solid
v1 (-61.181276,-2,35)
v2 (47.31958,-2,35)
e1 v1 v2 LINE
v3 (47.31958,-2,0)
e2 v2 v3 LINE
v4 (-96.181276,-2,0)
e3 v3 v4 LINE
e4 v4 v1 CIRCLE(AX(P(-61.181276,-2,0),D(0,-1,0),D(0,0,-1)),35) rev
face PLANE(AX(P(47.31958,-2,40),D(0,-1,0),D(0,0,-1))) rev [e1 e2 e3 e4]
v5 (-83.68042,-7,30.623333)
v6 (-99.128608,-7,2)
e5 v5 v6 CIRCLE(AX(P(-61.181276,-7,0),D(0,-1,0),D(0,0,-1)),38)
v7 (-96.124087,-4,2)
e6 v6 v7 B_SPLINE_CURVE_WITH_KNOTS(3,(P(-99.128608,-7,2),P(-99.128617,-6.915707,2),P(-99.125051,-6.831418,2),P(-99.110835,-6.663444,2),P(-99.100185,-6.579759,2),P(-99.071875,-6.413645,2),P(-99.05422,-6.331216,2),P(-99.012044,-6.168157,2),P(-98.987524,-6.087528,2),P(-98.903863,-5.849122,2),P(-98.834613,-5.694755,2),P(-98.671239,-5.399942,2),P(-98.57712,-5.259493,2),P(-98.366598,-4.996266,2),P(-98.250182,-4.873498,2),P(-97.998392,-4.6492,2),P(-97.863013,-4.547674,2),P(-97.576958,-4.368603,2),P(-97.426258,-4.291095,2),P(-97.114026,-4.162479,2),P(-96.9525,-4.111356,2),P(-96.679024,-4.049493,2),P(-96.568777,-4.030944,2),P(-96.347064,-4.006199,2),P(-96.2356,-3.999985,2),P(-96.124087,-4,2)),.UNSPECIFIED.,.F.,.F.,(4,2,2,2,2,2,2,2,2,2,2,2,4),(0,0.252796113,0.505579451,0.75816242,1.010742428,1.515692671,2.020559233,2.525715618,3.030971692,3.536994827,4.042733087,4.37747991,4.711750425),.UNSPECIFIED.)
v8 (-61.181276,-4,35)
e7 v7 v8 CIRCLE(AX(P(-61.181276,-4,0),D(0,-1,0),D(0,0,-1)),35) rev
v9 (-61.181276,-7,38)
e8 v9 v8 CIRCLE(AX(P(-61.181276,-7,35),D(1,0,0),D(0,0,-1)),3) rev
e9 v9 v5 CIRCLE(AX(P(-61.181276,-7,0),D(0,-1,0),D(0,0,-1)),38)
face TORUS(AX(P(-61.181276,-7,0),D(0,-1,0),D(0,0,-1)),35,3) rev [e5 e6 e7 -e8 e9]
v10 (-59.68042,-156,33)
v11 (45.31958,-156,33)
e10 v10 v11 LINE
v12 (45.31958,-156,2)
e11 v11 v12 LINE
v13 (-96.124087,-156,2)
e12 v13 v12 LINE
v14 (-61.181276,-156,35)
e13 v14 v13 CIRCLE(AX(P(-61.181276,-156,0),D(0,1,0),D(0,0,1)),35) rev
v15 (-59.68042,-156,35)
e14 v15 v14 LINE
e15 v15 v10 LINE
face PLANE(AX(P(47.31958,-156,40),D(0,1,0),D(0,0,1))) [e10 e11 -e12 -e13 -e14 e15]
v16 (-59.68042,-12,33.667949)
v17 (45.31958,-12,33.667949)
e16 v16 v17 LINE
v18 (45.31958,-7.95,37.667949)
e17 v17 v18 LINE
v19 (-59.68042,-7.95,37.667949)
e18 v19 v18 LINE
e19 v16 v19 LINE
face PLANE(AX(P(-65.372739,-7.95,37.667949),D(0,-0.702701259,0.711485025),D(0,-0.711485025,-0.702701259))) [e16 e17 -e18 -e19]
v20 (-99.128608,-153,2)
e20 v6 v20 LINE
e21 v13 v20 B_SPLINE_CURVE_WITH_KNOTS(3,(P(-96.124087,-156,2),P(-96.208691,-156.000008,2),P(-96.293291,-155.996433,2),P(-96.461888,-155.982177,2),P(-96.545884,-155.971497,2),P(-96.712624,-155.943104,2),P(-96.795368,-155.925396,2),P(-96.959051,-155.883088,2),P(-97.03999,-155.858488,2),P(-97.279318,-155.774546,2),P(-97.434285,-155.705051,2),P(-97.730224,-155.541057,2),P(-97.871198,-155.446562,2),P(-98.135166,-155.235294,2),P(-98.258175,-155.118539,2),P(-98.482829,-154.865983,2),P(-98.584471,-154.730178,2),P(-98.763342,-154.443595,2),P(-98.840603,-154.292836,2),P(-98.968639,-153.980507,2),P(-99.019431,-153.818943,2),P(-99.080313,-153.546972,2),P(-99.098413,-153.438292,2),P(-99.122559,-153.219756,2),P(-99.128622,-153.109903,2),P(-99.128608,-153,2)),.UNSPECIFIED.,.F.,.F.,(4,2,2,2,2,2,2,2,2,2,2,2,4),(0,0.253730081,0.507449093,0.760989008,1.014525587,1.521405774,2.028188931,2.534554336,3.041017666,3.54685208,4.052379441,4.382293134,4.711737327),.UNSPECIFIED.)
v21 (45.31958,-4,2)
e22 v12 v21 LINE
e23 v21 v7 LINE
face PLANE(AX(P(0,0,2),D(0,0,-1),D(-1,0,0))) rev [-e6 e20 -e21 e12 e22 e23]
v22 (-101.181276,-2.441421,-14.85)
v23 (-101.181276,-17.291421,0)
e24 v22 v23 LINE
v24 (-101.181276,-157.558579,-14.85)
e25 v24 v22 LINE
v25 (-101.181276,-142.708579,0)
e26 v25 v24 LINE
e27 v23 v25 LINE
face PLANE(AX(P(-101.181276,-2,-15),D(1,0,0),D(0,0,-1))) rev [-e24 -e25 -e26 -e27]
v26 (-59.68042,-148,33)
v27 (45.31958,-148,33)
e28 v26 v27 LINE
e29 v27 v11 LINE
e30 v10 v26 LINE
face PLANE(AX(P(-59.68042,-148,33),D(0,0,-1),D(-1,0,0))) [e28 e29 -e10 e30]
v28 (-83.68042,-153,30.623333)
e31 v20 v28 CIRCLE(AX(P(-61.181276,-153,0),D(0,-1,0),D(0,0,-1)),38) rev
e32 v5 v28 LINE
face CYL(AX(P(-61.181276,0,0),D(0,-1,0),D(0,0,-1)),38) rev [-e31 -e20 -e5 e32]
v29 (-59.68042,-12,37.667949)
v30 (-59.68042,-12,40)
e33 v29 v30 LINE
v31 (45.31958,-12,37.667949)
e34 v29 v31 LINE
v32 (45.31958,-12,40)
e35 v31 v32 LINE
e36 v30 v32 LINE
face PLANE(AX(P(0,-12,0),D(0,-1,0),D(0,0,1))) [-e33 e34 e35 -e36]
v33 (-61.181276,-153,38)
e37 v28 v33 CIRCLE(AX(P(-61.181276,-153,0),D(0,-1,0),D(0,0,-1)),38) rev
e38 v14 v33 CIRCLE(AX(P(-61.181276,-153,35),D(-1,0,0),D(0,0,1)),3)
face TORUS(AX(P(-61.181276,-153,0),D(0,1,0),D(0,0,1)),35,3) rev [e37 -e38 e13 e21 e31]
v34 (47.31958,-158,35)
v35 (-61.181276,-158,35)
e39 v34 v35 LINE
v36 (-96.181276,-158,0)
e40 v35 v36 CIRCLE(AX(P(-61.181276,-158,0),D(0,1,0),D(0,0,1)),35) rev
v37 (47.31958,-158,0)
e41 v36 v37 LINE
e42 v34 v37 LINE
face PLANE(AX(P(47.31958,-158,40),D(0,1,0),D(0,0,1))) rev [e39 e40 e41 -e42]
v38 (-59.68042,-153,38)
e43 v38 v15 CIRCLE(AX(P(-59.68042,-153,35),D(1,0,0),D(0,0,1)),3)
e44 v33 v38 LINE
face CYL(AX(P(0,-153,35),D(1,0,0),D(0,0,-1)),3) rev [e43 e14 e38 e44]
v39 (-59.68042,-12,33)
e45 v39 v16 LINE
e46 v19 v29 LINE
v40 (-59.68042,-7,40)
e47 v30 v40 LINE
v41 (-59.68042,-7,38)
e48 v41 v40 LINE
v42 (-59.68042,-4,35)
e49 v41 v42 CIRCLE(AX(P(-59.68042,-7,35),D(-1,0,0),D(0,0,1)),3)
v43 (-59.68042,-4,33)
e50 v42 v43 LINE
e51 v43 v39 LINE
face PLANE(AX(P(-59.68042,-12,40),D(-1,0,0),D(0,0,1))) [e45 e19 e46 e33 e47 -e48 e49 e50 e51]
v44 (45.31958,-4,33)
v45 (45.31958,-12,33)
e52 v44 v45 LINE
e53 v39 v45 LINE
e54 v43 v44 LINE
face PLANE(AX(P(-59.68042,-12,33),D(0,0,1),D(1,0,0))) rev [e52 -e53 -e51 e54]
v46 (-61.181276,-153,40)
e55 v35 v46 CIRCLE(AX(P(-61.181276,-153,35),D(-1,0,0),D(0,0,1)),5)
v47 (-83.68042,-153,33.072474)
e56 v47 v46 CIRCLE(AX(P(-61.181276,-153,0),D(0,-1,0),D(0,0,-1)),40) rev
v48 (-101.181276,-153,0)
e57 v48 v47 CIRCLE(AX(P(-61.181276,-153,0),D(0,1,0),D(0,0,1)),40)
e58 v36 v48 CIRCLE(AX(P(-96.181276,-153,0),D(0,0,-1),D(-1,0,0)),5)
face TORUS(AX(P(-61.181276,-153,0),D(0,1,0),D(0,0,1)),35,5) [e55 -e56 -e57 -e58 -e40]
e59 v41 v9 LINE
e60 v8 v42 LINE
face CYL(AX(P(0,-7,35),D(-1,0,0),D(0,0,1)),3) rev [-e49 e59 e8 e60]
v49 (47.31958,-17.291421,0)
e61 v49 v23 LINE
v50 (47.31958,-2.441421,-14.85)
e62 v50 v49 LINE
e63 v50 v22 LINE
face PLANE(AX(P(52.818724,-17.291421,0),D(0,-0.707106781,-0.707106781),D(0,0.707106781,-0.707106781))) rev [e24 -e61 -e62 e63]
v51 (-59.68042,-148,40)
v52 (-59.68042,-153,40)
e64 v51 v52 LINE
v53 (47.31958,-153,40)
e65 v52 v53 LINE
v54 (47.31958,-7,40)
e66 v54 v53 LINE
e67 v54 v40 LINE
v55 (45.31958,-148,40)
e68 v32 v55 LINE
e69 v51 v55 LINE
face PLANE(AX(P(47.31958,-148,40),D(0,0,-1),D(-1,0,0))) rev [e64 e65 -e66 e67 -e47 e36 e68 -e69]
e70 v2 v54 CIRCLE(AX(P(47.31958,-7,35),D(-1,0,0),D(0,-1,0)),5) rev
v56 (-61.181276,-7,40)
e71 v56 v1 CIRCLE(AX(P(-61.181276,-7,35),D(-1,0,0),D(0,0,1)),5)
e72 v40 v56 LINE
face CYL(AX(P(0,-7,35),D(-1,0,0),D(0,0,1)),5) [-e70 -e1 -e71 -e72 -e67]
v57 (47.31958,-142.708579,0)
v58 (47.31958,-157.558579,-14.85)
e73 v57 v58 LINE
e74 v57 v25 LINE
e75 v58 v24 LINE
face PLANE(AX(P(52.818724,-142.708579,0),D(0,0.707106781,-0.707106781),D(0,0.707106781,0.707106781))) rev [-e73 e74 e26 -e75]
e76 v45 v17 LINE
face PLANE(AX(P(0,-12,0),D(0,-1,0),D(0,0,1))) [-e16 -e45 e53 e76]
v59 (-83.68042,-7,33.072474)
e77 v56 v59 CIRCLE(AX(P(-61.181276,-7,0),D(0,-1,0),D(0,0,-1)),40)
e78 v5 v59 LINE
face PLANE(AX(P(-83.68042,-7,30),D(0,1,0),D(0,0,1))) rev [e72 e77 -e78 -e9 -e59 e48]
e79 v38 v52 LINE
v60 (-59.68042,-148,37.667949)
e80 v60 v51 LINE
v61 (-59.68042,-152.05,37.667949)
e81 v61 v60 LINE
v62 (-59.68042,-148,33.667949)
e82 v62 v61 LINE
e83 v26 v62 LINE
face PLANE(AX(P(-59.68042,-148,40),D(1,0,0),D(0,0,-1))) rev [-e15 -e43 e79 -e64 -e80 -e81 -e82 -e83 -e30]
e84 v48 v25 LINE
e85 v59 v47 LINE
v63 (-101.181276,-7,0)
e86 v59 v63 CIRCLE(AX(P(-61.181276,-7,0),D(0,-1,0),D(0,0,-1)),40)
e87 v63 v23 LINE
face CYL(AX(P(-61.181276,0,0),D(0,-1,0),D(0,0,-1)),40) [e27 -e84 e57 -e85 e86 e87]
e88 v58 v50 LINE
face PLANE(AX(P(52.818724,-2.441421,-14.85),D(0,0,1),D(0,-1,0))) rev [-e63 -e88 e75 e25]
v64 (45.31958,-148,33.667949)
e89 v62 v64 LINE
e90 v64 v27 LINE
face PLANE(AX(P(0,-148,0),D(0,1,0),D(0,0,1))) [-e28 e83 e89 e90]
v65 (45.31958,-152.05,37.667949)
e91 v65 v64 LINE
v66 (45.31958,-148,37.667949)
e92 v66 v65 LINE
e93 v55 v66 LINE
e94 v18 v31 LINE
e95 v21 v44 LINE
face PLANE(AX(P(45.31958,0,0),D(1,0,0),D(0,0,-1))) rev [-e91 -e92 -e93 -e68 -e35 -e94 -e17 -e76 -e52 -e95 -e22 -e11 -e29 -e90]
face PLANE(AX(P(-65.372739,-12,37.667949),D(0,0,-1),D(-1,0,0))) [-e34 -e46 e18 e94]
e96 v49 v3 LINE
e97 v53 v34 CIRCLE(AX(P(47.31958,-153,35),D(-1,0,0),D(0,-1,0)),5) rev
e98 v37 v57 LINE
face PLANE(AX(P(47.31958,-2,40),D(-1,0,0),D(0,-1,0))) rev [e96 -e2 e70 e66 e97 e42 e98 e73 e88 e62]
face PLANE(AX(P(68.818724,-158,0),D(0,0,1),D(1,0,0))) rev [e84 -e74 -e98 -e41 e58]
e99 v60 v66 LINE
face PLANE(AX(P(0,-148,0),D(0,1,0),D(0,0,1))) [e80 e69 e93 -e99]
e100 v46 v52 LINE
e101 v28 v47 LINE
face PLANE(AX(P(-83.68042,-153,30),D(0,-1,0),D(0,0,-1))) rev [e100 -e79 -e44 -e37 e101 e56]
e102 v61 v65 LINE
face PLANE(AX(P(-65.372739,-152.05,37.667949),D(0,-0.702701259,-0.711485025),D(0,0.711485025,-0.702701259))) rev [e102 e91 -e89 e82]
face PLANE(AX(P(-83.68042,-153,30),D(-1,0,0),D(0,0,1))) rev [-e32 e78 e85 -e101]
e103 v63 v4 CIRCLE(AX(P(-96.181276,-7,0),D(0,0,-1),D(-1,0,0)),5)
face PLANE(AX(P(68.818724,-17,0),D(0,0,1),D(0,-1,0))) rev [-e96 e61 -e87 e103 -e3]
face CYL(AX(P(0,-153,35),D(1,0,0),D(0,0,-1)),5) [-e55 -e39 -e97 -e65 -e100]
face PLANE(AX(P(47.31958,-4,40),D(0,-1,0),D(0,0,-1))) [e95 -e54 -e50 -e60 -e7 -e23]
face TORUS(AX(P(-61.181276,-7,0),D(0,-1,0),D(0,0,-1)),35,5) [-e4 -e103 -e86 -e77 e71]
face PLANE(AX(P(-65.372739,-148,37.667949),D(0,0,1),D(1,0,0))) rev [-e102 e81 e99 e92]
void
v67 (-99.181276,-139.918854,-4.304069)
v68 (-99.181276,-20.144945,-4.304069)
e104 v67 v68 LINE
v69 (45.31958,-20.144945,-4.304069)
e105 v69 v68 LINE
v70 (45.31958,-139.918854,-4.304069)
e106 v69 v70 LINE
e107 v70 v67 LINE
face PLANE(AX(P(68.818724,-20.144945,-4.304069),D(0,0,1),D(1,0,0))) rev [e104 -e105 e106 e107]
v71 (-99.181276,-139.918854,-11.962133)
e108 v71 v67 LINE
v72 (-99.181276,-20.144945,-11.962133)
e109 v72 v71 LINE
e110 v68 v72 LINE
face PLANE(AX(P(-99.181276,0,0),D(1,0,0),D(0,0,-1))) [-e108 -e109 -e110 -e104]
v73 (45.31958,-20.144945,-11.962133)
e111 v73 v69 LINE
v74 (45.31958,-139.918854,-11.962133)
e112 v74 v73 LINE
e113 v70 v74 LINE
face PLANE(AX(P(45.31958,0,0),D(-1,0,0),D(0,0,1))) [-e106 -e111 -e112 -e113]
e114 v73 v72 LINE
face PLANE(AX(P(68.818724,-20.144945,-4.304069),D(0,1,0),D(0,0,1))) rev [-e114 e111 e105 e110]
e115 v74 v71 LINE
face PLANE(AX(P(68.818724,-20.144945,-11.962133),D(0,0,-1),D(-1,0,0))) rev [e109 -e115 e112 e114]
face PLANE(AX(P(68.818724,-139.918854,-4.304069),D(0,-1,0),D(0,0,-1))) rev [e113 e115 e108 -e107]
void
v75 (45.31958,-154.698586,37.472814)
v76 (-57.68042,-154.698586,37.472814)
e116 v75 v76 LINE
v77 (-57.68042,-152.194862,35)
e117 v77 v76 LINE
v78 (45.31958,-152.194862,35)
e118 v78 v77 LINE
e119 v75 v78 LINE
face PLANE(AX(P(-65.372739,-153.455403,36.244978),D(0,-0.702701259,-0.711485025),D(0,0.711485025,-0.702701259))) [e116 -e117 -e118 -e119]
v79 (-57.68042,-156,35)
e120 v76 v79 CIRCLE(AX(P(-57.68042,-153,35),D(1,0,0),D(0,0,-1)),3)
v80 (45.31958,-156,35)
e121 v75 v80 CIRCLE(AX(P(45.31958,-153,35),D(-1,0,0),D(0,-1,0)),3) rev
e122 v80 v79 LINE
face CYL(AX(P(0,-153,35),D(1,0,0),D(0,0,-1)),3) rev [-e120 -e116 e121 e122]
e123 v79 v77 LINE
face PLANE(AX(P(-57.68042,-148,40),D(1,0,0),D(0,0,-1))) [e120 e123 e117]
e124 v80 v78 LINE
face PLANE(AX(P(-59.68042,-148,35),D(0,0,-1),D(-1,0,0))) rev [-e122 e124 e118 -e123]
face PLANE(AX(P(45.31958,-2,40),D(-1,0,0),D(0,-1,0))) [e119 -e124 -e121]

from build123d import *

# Parameters (mm, degrees)
SKETCH1_W            = 148.500856602
SKETCH1_H            = 156
BOSS_EXTRUDE1_DEPTH  = 40
FILLET3_R            = 40
FILLET4_R            = 5
SHELL4_T             = -2
SKETCH19_W           = 131
SKETCH19_H           = 146
CUT_EXTRUDE8_DEPTH   = 10
SKETCH21_W           = 107
SKETCH21_H           = 2
BOSS_EXTRUDE7_DEPTH  = 5
BOSS_EXTRUDE8_START  = -107
BOSS_EXTRUDE8_DEPTH  = 107
CUT_EXTRUDE9_DEPTH   = 107
BOSS_EXTRUDE9_DEPTH  = 2
BOSS_EXTRUDE10_DEPTH = 15
CUT_EXTRUDE10_DEPTH  = 170
SHELL5_START         = -57.680419874
SHELL5_DEPTH         = 103
SKETCH29_W           = 7.658063704
SKETCH29_H           = 119.773909492
CUT_EXTRUDE11_DEPTH  = 170
SKETCH31_W           = 7.658063704
SKETCH31_H           = 119.773909492
BOSS_EXTRUDE12_DEPTH = 2
SKETCH32_W           = 7.658063704
SKETCH32_H           = 119.773909492
BOSS_EXTRUDE13_DEPTH = 2
CUT_EXTRUDE12_DEPTH  = 154


# Read off the part's stored shape, not the designer's step: Shell5
# Some blends are built 0.0001 mm under size
with BuildPart() as part:
    # Sketch1 → Boss-Extrude1 (new body)
    with BuildSketch(Plane.XY):
        with Locations((-26.930848175, -80)):
            Rectangle(SKETCH1_W, SKETCH1_H)
    extrude(amount=BOSS_EXTRUDE1_DEPTH)

    # Fillet3
    fillet3_edges = [part.edges().sort_by_distance(p)[0] for p in [
        (-101.181276476, -80, 40),
    ]]
    fillet(fillet3_edges, radius=FILLET3_R - 0.0001)  # a hair under: the kernel refuses the full size

    # Fillet4
    # the kernel refuses this fillet: 5 mm, written as the material it takes off along each edge
    with BuildSketch(Plane(origin=(-61.181376476, -158, 40), x_dir=(0, 1, 0), z_dir=(1, 0, 0))) as fillet4_piece_1:
        with BuildLine():
            CenterArc((FILLET4_R, -FILLET4_R), FILLET4_R, 90, 90)
            Line((0, -FILLET4_R), (0, 0))
            Line((0, 0), (FILLET4_R, 0))
        make_face()
    extrude(amount=121.000956602, mode=Mode.SUBTRACT)
    with BuildSketch(Plane(origin=(-61.181376476, -158, 0.0001), x_dir=(-1, 0, 0), z_dir=(0, 0, -1))) as fillet4_piece_2:
        with BuildLine():
            CenterArc((39.9999 - FILLET4_R, FILLET4_R), FILLET4_R, 270, 90)
            Line((39.9999 - FILLET4_R, 0), (39.9999, 0))
            Line((39.9999, 0), (39.9999, FILLET4_R))
        make_face()
    revolve(axis=Axis((-61.181376476, -158, 0.0001), (0, 1, 0)), revolution_arc=90, mode=Mode.SUBTRACT)
    with BuildSketch(Plane(origin=(-61.181376476, -2, 0.0001), x_dir=(-1, 0, 0), z_dir=(0, 0, -1))) as fillet4_piece_3:
        with BuildLine():
            CenterArc((39.9999 - FILLET4_R, -FILLET4_R), FILLET4_R, 0, 90)
            Line((39.9999, -FILLET4_R), (39.9999, 0))
            Line((39.9999, 0), (39.9999 - FILLET4_R, 0))
        make_face()
    revolve(axis=Axis((-61.181376476, -2, 0.0001), (0, 1, 0)), revolution_arc=90, mode=Mode.SUBTRACT)
    with BuildSketch(Plane(origin=(59.819580126, -2, 40), x_dir=(0, 0, -1), z_dir=(-1, 0, 0))) as fillet4_piece_4:
        with BuildLine():
            CenterArc((FILLET4_R, FILLET4_R), FILLET4_R, 180, 90)
            Line((0, FILLET4_R), (0, 0))
            Line((0, 0), (FILLET4_R, 0))
        make_face()
    extrude(amount=121.000956602, mode=Mode.SUBTRACT)
    with BuildSketch(Plane(origin=(-101.181276476, -2, -12.5), x_dir=(1, 0, 0), z_dir=(0, 0, 1)), Plane(origin=(-101.181276476, -158, -12.5), x_dir=(0, 1, 0), z_dir=(0, 0, 1))) as fillet4_piece_5:
        with BuildLine():
            CenterArc((FILLET4_R, -FILLET4_R), FILLET4_R, 90, 90)
            Line((0, -FILLET4_R), (0, 0))
            Line((0, 0), (FILLET4_R, 0))
        make_face()
    extrude(amount=12.5001, mode=Mode.SUBTRACT)

    # Shell4
    shell4_openings = [part.faces().sort_by_distance(p)[0] for p in [
        (47.319580126, -80, 19.967473228),
    ]]
    offset(amount=SHELL4_T, openings=shell4_openings)

    # Sketch19 → Cut-Extrude8 (cut)
    with BuildSketch(Plane.XY.offset(40)):
        with Locations((-18.180419874, -80)):
            Rectangle(SKETCH19_W, SKETCH19_H)
    extrude(amount=-CUT_EXTRUDE8_DEPTH, mode=Mode.SUBTRACT)

    # Sketch21 → Boss-Extrude7 (add)
    with BuildSketch(Plane(origin=(0, -153, 0), x_dir=(1, 0, 0), z_dir=(0, 1, 0))):
        with Locations((-6.180419874, -39)):
            Rectangle(SKETCH21_W, SKETCH21_H)
    boss_extrude7 = extrude(amount=BOSS_EXTRUDE7_DEPTH)

    # Sketch22 → Boss-Extrude8 (add)
    with BuildSketch(Plane(origin=(47.319580126, 0, 0), x_dir=(0, 0, -1), z_dir=(1, 0, 0)).offset(BOSS_EXTRUDE8_START)):
        with BuildLine():
            Line((-38, -148), (-33, -148))
            Line((-33, -148), (-33, -156))
            Line((-33, -156), (-35, -156))
            ThreePointArc((-35, -156), (-37.121320344, -155.121320344), (-38, -153))
            Line((-38, -153), (-38, -148))
        make_face()
    boss_extrude8 = extrude(amount=BOSS_EXTRUDE8_DEPTH)

    # Sketch23 → Cut-Extrude9 (cut)
    with BuildSketch(Plane(origin=(47.319580126, 0, 0), x_dir=(0, 0, -1), z_dir=(1, 0, 0))):
        Polygon((-37.667948512, -148), (-37.667948512, -152.05), (-33.667948512, -148), align=None)
    cut_extrude9 = extrude(amount=-CUT_EXTRUDE9_DEPTH, mode=Mode.SUBTRACT)

    # Mirror1: Boss-Extrude7, Boss-Extrude8, Cut-Extrude9 across plane
    add(boss_extrude7.mirror(Plane.ZX.offset(-80)))
    add(boss_extrude8.mirror(Plane.ZX.offset(-80)))
    add(cut_extrude9.mirror(Plane.ZX.offset(-80)), mode=Mode.SUBTRACT)

    # Sketch25 → Boss-Extrude9 (add)
    with BuildSketch(Plane(origin=(47.319580126, 0, 0), x_dir=(0, 0, -1), z_dir=(1, 0, 0))):
        Polygon((-40, -148), (-37.667948512, -148), (-37.667948512, -152.05), (-33.667948512, -148), (-33, -148), (-33, -156), (-2, -156), (-2, -4), (-33, -4), (-33, -12), (-33.667948512, -12), (-37.667948512, -7.95), (-37.667948512, -12), (-40, -12), align=None)
    extrude(amount=-BOSS_EXTRUDE9_DEPTH)

    # Sketch26 → Boss-Extrude10 (add)
    with BuildSketch(Plane(origin=(0, 0, 0), x_dir=(-1, 0, 0), z_dir=(0, 0, -1))):
        Polygon((101.181276476, -7), (101.181276476, -153), (101.181276476, -158), (96.181276476, -158), (-47.319580126, -158), (-47.319580126, -2), (96.181276476, -2), (101.181276476, -2), align=None)
    extrude(amount=BOSS_EXTRUDE10_DEPTH)

    # Sketch27 → Cut-Extrude10 (cut)
    with BuildSketch(Plane.ZY.offset(101.181276476)):
        Polygon((-15.241421356, -1.9), (0, -1.9), (0, -2), (0, -17), (0, -17.141421356), align=None)
        Polygon((0, -142.858578644), (-15.241421356, -158.1), (0, -158.1), (0, -158), (0, -143), align=None)
    extrude(amount=-CUT_EXTRUDE10_DEPTH, mode=Mode.SUBTRACT)

    # Shell5 outline → Shell5 (cut)
    with BuildSketch(Plane.YZ.offset(SHELL5_START)):
        with BuildLine():
            Line((-152.194861825, 35), (-154.69858558, 37.472813585))
            ThreePointArc((-154.69858558, 37.472813585), (-155.654784053, 36.397183463), (-156, 35))
            Line((-156, 35), (-152.194861825, 35))
        make_face()
    extrude(amount=SHELL5_DEPTH, mode=Mode.SUBTRACT)

    # Sketch29 → Cut-Extrude11 (cut)
    with BuildSketch(Plane.ZY.offset(101.181276476)):
        with Locations((-8.13310084, -80.031899357)):
            Rectangle(SKETCH29_W, SKETCH29_H)
    extrude(amount=-CUT_EXTRUDE11_DEPTH, mode=Mode.SUBTRACT)

    # Sketch31 → Boss-Extrude12 (add)
    with BuildSketch(Plane(origin=(47.319580126, 0, 0), x_dir=(0, 0, -1), z_dir=(1, 0, 0))):
        with Locations((8.13310084, -80.031899357)):
            Rectangle(SKETCH31_W, SKETCH31_H)
    extrude(amount=-BOSS_EXTRUDE12_DEPTH)

    # Sketch32 → Boss-Extrude13 (add)
    with BuildSketch(Plane.ZY.offset(101.181276476)):
        with Locations((-8.13310084, -80.031899357)):
            Rectangle(SKETCH32_W, SKETCH32_H)
    extrude(amount=-BOSS_EXTRUDE13_DEPTH)

    # Sketch33 → Cut-Extrude12 (cut)
    with BuildSketch(Plane.ZY.offset(101.181276476)):
        Polygon((0, -17.141421356), (0, -17.291421356), (-14.85, -2.441421356), (-14.85, -13.62364303), (-14.85, -146.37635697), (-14.85, -157.558578644), (0, -142.708578644), (0, -142.858578644), (-15, -157.858578644), (-15, -2.141421356), align=None)
    extrude(amount=-CUT_EXTRUDE12_DEPTH, mode=Mode.SUBTRACT)


solid = part.part
